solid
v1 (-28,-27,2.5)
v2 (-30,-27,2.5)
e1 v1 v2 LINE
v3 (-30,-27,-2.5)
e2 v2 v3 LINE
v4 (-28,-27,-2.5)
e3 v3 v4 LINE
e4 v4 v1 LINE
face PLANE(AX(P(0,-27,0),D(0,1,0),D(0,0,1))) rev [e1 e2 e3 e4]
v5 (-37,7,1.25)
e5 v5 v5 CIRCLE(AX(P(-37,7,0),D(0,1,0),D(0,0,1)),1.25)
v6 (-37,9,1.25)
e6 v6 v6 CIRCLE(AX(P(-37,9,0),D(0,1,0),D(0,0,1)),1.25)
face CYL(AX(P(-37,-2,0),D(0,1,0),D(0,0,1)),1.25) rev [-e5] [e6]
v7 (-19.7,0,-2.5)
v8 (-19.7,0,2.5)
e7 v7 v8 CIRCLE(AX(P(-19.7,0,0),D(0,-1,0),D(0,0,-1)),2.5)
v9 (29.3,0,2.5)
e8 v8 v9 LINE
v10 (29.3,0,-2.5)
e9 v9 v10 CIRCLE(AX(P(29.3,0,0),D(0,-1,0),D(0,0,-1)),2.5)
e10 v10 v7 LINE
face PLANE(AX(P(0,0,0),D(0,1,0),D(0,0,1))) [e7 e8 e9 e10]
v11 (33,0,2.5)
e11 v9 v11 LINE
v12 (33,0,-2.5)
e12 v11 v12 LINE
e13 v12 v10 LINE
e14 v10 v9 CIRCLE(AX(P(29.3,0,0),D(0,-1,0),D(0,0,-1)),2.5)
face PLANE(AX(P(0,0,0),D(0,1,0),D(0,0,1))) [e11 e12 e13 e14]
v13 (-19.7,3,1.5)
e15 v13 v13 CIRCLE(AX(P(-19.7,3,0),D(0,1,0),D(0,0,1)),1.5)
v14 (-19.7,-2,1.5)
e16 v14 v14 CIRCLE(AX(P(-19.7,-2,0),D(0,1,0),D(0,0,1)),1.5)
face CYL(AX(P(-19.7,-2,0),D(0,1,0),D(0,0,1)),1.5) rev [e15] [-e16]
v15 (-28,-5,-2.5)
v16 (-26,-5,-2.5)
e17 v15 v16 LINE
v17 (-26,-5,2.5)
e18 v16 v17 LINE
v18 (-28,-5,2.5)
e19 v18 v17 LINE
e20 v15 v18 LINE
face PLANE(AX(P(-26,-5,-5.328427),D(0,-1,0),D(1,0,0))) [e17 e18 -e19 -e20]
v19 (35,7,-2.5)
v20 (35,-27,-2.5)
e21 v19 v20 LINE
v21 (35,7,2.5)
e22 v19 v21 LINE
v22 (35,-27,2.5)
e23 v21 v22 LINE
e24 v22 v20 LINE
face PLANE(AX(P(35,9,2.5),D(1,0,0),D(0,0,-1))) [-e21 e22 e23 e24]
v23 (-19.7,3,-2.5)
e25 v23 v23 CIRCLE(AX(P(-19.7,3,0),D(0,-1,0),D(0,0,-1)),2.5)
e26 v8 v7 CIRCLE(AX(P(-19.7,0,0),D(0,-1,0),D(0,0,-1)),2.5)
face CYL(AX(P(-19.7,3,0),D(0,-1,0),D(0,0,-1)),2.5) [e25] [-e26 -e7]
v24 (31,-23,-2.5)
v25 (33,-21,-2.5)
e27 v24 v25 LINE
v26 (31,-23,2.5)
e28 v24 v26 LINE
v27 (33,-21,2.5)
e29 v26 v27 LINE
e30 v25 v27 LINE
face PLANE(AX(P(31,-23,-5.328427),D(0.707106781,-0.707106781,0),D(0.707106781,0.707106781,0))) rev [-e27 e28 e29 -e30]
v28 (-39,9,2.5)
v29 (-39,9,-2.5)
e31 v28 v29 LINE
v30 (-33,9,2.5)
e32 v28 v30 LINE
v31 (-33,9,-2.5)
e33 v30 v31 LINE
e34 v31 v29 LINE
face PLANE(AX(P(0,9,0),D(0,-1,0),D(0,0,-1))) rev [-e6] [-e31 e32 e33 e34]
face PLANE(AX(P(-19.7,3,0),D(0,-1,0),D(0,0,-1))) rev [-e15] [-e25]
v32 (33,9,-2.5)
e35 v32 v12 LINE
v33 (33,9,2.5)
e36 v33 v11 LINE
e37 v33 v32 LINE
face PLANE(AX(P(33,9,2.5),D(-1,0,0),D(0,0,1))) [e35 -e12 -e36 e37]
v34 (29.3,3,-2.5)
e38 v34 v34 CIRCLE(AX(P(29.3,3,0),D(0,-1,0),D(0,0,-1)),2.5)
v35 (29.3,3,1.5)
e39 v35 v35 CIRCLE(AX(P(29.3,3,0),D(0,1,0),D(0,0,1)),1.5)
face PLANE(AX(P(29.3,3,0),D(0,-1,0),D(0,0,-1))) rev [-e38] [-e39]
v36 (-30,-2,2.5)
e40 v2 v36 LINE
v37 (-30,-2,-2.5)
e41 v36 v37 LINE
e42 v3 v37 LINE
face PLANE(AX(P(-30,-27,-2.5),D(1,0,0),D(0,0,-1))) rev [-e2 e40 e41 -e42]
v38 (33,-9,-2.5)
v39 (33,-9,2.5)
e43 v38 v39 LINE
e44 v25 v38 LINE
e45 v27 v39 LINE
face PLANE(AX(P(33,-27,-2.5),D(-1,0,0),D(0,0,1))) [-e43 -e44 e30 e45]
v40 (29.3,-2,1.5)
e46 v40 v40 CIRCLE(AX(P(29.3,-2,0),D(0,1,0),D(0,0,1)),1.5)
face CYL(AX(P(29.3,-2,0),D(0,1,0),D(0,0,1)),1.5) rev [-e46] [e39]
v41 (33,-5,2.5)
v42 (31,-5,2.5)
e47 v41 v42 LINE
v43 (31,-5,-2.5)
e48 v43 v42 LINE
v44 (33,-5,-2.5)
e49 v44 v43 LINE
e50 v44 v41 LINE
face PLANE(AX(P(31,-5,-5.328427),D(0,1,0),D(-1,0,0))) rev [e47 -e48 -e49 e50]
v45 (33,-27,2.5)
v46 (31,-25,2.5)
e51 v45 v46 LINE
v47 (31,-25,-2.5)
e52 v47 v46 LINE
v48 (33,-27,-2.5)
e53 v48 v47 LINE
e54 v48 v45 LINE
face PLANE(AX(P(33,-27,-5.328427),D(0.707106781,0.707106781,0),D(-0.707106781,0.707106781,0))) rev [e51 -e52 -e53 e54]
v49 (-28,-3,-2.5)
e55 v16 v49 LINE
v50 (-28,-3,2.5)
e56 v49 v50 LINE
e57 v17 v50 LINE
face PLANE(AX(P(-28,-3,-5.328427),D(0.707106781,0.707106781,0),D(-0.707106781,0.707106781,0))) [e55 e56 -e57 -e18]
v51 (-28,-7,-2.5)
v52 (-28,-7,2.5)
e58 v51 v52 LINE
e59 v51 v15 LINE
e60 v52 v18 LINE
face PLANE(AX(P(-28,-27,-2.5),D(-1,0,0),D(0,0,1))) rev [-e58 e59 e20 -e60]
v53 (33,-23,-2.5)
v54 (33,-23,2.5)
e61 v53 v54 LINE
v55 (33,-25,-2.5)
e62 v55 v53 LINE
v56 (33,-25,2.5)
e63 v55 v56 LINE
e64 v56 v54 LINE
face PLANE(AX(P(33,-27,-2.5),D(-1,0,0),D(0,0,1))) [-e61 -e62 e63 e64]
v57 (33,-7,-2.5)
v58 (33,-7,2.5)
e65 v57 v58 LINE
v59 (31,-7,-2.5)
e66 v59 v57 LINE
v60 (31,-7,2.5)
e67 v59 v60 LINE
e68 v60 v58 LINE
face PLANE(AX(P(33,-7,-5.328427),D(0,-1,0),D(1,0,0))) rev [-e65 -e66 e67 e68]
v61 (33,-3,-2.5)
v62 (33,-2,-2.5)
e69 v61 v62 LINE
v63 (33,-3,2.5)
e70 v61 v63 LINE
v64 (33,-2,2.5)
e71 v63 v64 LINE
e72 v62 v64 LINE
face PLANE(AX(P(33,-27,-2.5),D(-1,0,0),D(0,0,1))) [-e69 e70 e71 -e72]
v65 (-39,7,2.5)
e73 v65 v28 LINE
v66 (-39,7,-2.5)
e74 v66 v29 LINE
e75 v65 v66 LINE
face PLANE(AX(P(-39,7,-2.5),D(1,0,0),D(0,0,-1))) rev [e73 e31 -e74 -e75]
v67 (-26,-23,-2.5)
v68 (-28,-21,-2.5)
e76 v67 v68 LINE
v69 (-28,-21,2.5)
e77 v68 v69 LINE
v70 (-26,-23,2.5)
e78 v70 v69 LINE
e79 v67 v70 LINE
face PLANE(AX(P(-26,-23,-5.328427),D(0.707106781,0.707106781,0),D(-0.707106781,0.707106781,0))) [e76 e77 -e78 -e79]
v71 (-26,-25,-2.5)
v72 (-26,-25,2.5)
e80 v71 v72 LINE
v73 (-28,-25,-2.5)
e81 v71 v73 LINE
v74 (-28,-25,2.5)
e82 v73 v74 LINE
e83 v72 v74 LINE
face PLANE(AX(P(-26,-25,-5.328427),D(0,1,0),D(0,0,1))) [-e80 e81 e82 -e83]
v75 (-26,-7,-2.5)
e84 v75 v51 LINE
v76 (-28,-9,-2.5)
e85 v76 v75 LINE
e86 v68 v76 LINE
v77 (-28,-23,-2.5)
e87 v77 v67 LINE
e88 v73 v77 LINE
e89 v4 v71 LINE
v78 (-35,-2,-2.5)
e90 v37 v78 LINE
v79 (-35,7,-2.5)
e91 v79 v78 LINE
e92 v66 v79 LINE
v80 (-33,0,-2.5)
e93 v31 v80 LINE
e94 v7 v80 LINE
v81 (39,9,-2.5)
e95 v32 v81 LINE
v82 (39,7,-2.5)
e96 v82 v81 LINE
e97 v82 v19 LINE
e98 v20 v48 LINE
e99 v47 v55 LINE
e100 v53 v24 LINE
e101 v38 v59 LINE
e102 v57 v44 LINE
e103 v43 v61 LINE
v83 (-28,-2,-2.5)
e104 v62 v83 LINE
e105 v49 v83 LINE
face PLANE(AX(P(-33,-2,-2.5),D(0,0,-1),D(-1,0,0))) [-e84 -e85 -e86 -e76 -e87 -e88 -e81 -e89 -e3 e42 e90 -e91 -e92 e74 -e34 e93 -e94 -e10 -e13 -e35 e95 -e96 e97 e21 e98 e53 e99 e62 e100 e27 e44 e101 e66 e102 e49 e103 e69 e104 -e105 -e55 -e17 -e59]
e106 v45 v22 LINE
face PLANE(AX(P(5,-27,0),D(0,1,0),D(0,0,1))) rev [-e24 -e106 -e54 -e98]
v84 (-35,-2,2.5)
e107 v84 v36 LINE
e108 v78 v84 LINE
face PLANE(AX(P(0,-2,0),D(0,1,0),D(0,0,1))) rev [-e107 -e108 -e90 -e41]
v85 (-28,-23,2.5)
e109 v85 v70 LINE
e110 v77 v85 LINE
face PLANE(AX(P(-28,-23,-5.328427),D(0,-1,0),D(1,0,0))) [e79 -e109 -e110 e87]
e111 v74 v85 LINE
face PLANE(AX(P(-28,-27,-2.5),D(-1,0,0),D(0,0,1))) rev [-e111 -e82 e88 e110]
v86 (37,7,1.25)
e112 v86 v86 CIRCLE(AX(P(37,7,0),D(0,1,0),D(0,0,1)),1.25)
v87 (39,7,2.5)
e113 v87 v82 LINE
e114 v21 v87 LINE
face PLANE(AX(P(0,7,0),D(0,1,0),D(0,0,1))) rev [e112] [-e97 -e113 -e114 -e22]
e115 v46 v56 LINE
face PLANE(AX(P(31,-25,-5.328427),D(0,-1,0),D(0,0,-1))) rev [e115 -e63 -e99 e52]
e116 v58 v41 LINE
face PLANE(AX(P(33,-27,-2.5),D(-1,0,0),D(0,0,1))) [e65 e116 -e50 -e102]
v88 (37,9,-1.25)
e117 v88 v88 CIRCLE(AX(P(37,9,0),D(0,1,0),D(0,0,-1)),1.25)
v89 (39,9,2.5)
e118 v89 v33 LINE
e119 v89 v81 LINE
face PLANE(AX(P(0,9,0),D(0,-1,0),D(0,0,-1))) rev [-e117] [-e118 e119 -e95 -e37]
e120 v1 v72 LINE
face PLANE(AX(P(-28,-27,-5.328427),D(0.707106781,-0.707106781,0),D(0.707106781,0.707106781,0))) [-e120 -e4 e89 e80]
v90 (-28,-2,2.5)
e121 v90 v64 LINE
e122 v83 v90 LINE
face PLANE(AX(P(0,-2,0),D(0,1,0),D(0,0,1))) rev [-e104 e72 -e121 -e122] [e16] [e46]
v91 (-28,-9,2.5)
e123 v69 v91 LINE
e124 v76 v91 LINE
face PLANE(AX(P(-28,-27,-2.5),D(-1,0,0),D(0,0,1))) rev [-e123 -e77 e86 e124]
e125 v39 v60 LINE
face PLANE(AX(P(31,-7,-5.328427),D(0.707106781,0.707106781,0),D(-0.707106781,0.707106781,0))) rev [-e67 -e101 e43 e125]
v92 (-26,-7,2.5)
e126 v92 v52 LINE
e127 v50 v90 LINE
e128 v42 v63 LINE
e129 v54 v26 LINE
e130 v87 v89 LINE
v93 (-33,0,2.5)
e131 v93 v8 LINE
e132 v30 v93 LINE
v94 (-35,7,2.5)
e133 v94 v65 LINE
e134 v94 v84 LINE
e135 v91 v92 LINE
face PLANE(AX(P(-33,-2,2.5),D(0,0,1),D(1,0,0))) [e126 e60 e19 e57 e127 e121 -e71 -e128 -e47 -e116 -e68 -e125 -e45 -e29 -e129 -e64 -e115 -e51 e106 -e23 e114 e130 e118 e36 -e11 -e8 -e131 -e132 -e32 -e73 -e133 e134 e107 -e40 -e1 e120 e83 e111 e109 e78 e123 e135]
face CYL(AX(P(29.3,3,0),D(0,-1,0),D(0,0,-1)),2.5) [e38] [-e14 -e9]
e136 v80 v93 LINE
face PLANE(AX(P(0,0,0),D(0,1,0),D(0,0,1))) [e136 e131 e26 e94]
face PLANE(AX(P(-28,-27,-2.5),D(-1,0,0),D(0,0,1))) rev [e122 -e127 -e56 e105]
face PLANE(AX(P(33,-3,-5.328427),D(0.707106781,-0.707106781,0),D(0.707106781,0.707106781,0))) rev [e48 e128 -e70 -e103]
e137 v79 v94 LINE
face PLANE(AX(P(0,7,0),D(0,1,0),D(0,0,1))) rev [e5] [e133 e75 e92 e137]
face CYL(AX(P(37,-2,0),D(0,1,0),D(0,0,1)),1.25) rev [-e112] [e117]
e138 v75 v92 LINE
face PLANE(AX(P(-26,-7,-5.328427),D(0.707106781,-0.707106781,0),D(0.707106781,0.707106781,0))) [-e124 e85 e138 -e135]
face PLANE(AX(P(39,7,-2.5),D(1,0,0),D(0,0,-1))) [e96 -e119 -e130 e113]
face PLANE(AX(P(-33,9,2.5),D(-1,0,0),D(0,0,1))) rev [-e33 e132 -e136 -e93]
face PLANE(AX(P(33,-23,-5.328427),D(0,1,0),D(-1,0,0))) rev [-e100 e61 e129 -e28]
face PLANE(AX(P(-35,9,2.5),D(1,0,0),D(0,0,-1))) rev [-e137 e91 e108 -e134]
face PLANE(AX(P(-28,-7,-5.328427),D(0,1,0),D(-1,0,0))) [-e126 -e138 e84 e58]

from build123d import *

# Parameters (mm, degrees)
SKETCH1_W           = 66
SKETCH1_H           = 5
BASE_FLANGE1_DEPTH  = 2
SKETCH2_R           = 2.5
BOSS_EXTRUDE1_DEPTH = 3
SKETCH3_W           = 2
SKETCH3_H           = 5
BOSS_EXTRUDE2_DEPTH = 11
SKETCH4_W           = 6
SKETCH4_H           = 5
BOSS_EXTRUDE3_DEPTH = 2
SKETCH5_R           = 1.5
CUT_EXTRUDE1_DEPTH  = 40.537956447
SKETCH6_R           = 1.25
CUT_EXTRUDE2_DEPTH  = 41.598645298
SKETCH7_W           = 2
SKETCH7_H           = 5
BOSS_EXTRUDE4_DEPTH = 25
BOSS_EXTRUDE5_DEPTH = 5


# Sheet-metal steps are written as plain solids
with BuildPart() as part:
    # Sketch1 → Base-Flange1 (new body)
    with BuildSketch(Plane(origin=(0, 0, 0), x_dir=(1, 0, 0), z_dir=(0, 1, 0))):
        Rectangle(SKETCH1_W, SKETCH1_H)
    extrude(amount=-BASE_FLANGE1_DEPTH)

    # Sketch2 → Boss-Extrude1 (add)
    with BuildSketch(Plane(origin=(0, 0, 0), x_dir=(-1, 0, 0), z_dir=(0, -1, 0))):
        with Locations(Location((19.7, 0, 0), (0, 0, 90))):
            Circle(SKETCH2_R)
        with Locations(Location((-29.3, 0, 0), (0, 0, 90))):
            Circle(SKETCH2_R)
    extrude(amount=-BOSS_EXTRUDE1_DEPTH)

    # Sketch3 → Boss-Extrude2 (add)
    with BuildSketch(Plane(origin=(0, -2, 0), x_dir=(-1, 0, 0), z_dir=(0, -1, 0))):
        with Locations((-34, 0)):
            Rectangle(SKETCH3_W, SKETCH3_H)
    boss_extrude2 = extrude(amount=-BOSS_EXTRUDE2_DEPTH)

    # Sketch4 → Boss-Extrude3 (add)
    with BuildSketch(Plane(origin=(0, 9, 0), x_dir=(1, 0, 0), z_dir=(0, 1, 0))):
        with Locations((36, 0)):
            Rectangle(SKETCH4_W, SKETCH4_H)
    boss_extrude3 = extrude(amount=-BOSS_EXTRUDE3_DEPTH)

    # Mirror1: Boss-Extrude2, Boss-Extrude3 across plane
    add(boss_extrude2.mirror(Plane(origin=(0, 0, 0), x_dir=(0, 0, 1), z_dir=(1, 0, 0))))
    add(boss_extrude3.mirror(Plane(origin=(0, 0, 0), x_dir=(0, 0, 1), z_dir=(1, 0, 0))))

    # Sketch5 → Cut-Extrude1 (cut, through all)
    with BuildSketch(Plane(origin=(0, 3, 0), x_dir=(1, 0, 0), z_dir=(0, 1, 0))):
        with Locations(Location((-19.7, 0, 0), (0, 0, 270))):
            Circle(SKETCH5_R)
        with Locations(Location((29.3, 0, 0), (0, 0, 270))):
            Circle(SKETCH5_R)
    extrude(amount=-CUT_EXTRUDE1_DEPTH, mode=Mode.SUBTRACT)

    # Sketch6 → Cut-Extrude2 (cut, through all)
    with BuildSketch(Plane(origin=(0, 9, 0), x_dir=(1, 0, 0), z_dir=(0, 1, 0))):
        with Locations(Location((-37, 0, 0), (0, 0, 270))):
            Circle(SKETCH6_R)
        with Locations(Location((37, 0, 0), (0, 0, 270))):
            Circle(SKETCH6_R)
    extrude(amount=-CUT_EXTRUDE2_DEPTH, mode=Mode.SUBTRACT)

    # Sketch7 → Boss-Extrude4 (add)
    with BuildSketch(Plane(origin=(0, -2, 0), x_dir=(-1, 0, 0), z_dir=(0, -1, 0))):
        with Locations((29, 0)):
            Rectangle(SKETCH7_W, SKETCH7_H)
    boss_extrude4 = extrude(amount=BOSS_EXTRUDE4_DEPTH)

    # Sketch8 → Boss-Extrude5 (add)
    with BuildSketch(Plane.XY.offset(2.5)):
        Polygon((-28, -3), (-26, -5), (-28, -5), align=None)
        Polygon((-28, -7), (-26, -7), (-28, -9), align=None)
        Polygon((-28, -21), (-28, -23), (-26, -23), align=None)
        Polygon((-28, -25), (-28, -27), (-26, -25), align=None)
    boss_extrude5 = extrude(amount=-BOSS_EXTRUDE5_DEPTH)

    # Mirror2: Boss-Extrude4, Boss-Extrude5 across plane
    add(boss_extrude4.mirror(Plane(origin=(2.5, 0, 0), x_dir=(0, 0, 1), z_dir=(1, 0, 0))))
    add(boss_extrude5.mirror(Plane(origin=(2.5, 0, 0), x_dir=(0, 0, 1), z_dir=(1, 0, 0))))


solid = part.part
